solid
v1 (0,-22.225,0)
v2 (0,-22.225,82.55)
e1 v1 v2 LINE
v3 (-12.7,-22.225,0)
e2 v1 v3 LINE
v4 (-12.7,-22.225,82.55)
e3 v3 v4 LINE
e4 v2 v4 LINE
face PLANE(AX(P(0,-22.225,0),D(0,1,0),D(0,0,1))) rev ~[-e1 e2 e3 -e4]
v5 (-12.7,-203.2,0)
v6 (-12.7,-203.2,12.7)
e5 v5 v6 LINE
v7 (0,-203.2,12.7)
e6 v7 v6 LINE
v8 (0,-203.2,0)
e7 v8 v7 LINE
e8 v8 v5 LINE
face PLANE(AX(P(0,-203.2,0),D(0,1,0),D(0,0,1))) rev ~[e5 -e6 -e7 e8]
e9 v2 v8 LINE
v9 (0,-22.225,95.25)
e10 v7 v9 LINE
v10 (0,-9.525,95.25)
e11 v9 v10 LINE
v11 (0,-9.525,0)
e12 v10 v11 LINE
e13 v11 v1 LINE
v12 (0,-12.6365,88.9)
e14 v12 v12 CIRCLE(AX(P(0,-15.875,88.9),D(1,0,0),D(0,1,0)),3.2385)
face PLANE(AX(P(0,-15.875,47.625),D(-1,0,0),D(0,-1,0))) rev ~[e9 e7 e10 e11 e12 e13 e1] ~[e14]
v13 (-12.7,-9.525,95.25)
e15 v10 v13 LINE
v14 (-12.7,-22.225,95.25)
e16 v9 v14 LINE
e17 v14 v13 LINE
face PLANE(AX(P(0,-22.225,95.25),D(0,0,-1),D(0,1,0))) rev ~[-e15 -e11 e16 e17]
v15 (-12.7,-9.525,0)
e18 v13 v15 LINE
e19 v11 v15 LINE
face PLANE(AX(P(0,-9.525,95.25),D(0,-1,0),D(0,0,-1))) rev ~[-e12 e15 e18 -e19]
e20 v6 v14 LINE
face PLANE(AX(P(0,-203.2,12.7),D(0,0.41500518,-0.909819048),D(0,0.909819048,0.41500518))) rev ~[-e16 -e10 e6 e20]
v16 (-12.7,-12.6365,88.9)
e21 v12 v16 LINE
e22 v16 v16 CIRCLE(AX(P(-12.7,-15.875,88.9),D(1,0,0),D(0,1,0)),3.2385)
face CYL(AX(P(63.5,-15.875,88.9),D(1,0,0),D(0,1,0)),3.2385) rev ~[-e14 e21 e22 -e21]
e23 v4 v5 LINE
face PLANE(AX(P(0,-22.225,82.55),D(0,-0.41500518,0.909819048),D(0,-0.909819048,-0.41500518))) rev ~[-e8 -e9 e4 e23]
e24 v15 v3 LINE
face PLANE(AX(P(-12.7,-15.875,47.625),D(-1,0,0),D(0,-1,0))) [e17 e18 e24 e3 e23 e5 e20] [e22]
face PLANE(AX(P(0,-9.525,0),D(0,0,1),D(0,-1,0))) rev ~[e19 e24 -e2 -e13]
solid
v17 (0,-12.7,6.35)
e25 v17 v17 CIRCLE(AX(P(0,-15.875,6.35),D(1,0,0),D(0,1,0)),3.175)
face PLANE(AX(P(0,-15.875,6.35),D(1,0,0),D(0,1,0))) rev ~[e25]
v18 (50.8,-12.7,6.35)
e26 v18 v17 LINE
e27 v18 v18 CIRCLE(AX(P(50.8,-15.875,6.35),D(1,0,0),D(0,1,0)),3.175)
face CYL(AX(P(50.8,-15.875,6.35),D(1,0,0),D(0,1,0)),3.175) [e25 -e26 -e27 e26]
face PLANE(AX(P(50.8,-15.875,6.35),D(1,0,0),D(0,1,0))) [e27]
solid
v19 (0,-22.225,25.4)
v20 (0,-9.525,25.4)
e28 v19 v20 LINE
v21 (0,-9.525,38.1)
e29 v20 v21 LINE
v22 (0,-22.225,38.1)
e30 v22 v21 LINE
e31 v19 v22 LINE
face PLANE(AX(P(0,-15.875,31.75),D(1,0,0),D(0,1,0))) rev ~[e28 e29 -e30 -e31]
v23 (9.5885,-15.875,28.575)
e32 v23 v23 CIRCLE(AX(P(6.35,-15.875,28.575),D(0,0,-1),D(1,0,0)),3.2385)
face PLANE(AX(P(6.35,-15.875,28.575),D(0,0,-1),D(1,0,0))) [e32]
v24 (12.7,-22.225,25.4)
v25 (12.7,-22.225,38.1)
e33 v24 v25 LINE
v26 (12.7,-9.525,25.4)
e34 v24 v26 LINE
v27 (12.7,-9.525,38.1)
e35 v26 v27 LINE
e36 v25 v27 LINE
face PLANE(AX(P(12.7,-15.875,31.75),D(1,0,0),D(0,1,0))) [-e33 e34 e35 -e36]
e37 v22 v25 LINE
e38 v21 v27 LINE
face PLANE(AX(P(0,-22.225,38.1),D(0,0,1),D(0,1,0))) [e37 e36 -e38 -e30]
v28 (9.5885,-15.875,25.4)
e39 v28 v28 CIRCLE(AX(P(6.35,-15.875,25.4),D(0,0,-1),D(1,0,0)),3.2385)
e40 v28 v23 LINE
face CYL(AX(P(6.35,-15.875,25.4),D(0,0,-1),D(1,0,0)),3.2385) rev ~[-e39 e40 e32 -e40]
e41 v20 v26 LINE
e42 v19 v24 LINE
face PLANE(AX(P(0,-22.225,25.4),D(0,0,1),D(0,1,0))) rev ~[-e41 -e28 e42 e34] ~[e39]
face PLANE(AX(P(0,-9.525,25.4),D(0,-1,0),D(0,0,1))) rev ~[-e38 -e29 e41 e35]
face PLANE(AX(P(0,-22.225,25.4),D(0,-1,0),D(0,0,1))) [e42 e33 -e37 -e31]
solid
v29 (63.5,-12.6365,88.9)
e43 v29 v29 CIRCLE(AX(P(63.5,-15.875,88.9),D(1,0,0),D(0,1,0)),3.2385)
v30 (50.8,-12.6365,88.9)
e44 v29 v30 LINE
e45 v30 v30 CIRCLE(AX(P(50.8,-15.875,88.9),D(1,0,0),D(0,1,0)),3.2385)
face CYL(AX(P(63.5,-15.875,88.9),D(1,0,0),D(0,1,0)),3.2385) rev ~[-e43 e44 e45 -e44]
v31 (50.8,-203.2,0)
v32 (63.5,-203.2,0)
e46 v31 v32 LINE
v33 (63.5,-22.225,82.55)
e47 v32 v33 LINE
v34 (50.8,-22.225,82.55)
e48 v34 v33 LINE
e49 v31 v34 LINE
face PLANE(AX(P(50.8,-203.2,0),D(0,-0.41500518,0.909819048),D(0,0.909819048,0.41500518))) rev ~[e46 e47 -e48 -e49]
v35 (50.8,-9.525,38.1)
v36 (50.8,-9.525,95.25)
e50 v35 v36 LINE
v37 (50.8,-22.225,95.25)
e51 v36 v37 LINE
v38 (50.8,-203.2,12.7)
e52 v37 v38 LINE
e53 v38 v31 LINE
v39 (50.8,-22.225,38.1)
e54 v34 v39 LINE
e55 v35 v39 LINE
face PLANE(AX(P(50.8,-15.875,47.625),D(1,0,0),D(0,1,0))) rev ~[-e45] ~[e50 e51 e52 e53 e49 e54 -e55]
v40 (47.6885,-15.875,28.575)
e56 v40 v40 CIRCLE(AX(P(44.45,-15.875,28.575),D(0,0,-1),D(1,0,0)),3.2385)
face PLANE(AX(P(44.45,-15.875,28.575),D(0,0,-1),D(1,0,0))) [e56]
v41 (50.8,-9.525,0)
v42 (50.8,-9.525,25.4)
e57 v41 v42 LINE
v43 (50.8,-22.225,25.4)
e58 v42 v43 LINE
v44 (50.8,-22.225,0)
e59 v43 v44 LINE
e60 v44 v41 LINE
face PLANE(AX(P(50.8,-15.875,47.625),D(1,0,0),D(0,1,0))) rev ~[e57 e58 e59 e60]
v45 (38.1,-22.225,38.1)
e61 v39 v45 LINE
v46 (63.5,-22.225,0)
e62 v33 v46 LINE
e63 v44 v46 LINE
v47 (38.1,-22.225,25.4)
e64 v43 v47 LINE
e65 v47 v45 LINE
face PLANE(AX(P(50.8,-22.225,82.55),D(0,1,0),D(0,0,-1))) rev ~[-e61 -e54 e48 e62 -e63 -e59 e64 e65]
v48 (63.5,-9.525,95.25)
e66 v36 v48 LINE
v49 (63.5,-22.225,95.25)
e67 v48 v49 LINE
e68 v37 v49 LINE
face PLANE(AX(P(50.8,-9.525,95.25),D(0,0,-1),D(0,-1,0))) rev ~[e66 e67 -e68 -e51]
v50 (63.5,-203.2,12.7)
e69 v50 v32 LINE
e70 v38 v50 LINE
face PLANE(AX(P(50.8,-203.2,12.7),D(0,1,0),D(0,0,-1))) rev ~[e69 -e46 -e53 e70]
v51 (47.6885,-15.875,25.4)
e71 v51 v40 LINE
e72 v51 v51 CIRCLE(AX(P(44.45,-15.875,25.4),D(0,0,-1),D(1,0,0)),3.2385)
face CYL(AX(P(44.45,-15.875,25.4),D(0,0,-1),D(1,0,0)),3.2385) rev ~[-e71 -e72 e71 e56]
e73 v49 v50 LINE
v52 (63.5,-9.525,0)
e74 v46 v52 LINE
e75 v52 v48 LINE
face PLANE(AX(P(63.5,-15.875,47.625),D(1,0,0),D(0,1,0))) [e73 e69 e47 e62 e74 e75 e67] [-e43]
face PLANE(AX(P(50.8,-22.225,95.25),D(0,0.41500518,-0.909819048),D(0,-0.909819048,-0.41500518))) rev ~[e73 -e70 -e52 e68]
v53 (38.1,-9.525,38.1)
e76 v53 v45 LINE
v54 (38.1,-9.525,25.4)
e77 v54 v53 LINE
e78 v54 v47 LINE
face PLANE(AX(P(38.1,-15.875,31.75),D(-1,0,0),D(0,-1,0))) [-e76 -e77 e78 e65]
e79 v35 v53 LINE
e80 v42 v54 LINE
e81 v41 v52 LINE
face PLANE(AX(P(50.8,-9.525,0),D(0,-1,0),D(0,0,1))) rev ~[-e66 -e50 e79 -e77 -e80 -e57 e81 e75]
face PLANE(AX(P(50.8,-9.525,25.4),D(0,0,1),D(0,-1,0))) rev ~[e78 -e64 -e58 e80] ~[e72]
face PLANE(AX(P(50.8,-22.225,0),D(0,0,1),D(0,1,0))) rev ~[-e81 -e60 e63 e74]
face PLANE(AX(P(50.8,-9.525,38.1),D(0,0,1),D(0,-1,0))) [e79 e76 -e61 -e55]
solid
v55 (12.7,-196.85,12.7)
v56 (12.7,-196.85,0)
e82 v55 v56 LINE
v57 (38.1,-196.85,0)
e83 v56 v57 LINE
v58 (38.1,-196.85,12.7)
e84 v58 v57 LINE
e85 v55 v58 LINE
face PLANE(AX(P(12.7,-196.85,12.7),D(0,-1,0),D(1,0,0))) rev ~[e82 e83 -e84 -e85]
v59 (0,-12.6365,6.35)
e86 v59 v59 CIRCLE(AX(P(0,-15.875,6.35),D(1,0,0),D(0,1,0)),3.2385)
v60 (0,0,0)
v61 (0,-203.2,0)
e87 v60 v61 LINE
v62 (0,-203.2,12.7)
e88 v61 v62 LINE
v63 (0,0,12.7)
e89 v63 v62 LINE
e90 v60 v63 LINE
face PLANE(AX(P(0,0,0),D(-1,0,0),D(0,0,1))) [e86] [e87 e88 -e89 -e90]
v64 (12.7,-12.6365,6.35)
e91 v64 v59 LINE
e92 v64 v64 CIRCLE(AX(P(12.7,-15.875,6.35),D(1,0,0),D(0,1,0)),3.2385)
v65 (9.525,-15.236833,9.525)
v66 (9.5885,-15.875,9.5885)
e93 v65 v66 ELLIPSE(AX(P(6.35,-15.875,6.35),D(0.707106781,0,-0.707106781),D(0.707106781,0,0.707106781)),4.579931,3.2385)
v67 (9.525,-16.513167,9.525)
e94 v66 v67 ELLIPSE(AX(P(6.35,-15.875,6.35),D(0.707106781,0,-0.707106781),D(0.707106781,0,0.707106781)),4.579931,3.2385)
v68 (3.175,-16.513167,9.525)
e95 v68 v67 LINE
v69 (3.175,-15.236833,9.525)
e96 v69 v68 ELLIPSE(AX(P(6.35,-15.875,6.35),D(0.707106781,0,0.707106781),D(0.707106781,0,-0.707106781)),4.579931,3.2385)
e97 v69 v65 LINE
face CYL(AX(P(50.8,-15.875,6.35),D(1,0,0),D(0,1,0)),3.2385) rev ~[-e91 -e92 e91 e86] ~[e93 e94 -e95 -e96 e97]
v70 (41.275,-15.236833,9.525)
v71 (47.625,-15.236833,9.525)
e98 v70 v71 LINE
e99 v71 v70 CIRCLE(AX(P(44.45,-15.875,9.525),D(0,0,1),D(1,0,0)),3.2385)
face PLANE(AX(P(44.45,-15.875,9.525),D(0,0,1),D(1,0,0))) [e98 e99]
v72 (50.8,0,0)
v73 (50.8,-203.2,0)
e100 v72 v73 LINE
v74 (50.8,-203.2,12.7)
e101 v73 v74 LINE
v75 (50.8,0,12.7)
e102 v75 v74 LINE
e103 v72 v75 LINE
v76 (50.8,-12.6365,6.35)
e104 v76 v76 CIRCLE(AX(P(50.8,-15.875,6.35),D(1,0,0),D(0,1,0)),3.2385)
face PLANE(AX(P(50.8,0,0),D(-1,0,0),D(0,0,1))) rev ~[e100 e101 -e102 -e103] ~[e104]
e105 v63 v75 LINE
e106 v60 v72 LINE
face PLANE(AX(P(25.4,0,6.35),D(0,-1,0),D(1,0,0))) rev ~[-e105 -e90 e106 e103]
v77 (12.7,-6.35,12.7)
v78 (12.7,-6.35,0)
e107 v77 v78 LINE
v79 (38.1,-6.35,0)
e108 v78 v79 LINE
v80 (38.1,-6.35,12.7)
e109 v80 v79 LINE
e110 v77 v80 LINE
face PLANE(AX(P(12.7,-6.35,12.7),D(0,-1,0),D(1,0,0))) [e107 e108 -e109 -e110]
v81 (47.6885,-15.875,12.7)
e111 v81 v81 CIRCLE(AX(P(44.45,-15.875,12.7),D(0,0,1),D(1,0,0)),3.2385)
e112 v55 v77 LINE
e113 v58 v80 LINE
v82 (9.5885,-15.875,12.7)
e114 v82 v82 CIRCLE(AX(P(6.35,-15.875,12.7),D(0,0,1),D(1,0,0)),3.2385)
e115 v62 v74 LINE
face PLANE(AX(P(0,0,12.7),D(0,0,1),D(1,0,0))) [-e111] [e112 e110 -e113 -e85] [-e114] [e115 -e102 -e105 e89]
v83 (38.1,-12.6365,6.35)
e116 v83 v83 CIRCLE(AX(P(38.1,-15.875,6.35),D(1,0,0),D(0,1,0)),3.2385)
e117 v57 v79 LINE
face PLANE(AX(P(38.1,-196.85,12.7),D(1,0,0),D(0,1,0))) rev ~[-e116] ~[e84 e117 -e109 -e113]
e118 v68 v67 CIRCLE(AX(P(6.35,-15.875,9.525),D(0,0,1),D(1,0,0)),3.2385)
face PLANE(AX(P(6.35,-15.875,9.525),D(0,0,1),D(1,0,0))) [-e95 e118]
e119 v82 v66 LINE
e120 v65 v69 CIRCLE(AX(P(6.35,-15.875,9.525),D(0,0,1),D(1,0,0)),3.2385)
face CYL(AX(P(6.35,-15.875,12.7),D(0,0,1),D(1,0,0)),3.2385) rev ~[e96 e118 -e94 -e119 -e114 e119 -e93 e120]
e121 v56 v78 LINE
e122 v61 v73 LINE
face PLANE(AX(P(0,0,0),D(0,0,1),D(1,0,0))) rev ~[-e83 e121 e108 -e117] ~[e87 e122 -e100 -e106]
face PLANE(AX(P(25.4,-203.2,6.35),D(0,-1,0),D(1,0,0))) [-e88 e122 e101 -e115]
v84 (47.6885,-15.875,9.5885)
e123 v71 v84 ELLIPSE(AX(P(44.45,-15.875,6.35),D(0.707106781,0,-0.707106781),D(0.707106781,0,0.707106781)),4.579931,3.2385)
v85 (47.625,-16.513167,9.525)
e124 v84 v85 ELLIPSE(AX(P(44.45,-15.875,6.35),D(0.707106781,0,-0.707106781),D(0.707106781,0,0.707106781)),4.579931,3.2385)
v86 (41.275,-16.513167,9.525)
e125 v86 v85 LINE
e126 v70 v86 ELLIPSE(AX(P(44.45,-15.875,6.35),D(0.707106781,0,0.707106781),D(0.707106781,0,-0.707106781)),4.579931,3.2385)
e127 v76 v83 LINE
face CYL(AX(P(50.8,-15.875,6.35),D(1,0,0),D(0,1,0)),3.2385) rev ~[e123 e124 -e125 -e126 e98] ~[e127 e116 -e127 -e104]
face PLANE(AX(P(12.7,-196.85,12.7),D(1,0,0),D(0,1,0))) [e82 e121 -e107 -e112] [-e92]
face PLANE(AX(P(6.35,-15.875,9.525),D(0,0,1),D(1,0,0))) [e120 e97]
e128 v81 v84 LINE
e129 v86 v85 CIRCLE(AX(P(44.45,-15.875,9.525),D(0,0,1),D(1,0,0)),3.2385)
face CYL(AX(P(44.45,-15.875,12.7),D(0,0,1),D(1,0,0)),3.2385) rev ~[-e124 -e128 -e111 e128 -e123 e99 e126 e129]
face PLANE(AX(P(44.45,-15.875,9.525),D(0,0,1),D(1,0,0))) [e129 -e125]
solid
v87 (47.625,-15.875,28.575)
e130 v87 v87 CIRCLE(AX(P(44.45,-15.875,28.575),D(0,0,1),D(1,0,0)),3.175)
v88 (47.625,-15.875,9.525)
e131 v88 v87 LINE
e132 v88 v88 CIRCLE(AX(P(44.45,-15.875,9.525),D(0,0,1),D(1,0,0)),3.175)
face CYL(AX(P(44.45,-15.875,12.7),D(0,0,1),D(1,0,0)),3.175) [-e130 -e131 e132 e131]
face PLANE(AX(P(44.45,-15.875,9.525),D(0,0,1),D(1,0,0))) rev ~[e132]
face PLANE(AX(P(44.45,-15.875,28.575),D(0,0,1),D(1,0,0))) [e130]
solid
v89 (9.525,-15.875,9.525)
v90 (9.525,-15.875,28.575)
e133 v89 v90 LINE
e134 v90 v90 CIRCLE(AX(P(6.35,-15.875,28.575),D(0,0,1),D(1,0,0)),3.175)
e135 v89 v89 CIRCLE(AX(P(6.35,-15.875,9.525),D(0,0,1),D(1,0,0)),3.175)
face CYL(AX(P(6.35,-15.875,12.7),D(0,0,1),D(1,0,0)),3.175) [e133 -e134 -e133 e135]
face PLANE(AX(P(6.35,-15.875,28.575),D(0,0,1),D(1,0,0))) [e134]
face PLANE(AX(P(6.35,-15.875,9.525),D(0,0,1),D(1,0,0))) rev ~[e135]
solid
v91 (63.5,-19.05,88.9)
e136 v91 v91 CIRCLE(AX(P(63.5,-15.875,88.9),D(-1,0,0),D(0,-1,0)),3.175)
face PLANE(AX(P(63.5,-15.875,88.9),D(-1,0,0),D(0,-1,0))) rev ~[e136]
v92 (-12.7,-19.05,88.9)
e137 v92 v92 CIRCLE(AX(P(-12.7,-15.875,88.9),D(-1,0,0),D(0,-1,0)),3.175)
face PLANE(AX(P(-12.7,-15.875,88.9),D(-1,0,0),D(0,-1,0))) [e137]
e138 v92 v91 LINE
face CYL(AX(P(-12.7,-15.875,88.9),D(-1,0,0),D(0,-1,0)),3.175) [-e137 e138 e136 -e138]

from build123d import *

# Parameters (mm, degrees)
F0_W           = 50.8
F0_H           = 12.7
F1_DEPTH       = 203.2
F2_W           = 25.4
F2_H           = 190.5
F3_DEPTH       = 12.701
F4_R           = 3.2385
F5_DEPTH       = 50.801
F6_R           = 3.175
F7_DEPTH       = 50.8
F9_DEPTH       = 12.7
F11_DEPTH      = 12.7
F12_R          = 3.2385
F13_DEPTH      = 76.201
F14_R          = 3.2385
F15_DEPTH      = 76.201
F16_R          = 3.175
F17_DEPTH      = 76.2
F18_R          = 3.2385
F19_DEPTH      = 3.175
F20_R          = 3.175
F21_DEPTH      = 15.875
F21_DEPTH_BACK = 3.175
F22_W          = 12.7
F22_H          = 12.7
F23_DEPTH      = 12.7
F24_R          = 3.2385
F25_DEPTH      = 3.175
F26_W          = 12.7
F26_H          = 12.7
F27_DEPTH      = 12.7
F28_R          = 3.2385
F29_DEPTH      = 3.175


with BuildPart() as f1:
    # F0 (on Front) → F1 (new body)
    with BuildSketch(Plane.XZ):
        with Locations((25.4, 6.35)):
            Rectangle(F0_W, F0_H)
    extrude(amount=F1_DEPTH)

    # F2 (on face) → F3 (cut, through all)
    with BuildSketch(Plane.XY.offset(12.7)):
        with Locations((25.4, -101.6)):
            Rectangle(F2_W, F2_H)
    extrude(amount=-F3_DEPTH, mode=Mode.SUBTRACT)

    # F4 (on face) → F5 (cut, through all)
    with BuildSketch(Plane.YZ.offset(50.8)):
        with Locations((-15.875, 6.35)):
            Circle(F4_R)
    extrude(amount=-F5_DEPTH, mode=Mode.SUBTRACT)

    # F14 (on face) → F15 (cut, through all)
    with BuildSketch(Plane(origin=(-12.7, 0, 0), x_dir=(0, -1, 0), z_dir=(-1, 0, 0))):
        with Locations((15.875, 88.9)):
            Circle(F14_R)
    extrude(amount=-F15_DEPTH, mode=Mode.SUBTRACT)

    # F18 (on face) → F19 (cut)
    with BuildSketch(Plane.XY.offset(12.7)):
        with Locations((6.35, -15.875)):
            Circle(F18_R)
        with Locations((44.45, -15.875)):
            Circle(F18_R)
    extrude(amount=-F19_DEPTH, mode=Mode.SUBTRACT)


with BuildPart() as f7:
    # F6 (on face) → F7 (new body)
    with BuildSketch(Plane.YZ.offset(50.8)):
        with Locations((-15.875, 6.35)):
            Circle(F6_R)
    extrude(amount=-F7_DEPTH)


with BuildPart() as f9:
    # F8 (on face) → F9 (new body)
    with BuildSketch(Plane.YZ.offset(50.8)):
        Polygon((-22.225, 0), (-9.525, 0), (-9.525, 95.25), (-22.225, 95.25), (-22.225, 82.55), align=None)
        Polygon((-203.2, 0), (-22.225, 82.55), (-22.225, 95.25), (-203.2, 12.7), align=None)
    extrude(amount=F9_DEPTH)


with BuildPart() as f11:
    # F10 (on face) → F11 (new body)
    with BuildSketch(Plane(origin=(0, 0, 0), x_dir=(0, -1, 0), z_dir=(-1, 0, 0))):
        Polygon((9.525, 95.25), (9.525, 0), (22.225, 0), (22.225, 82.55), (22.225, 95.25), align=None)
        Polygon((22.225, 95.25), (22.225, 82.55), (203.2, 0), (203.2, 12.7), align=None)
    extrude(amount=F11_DEPTH)


with BuildPart() as f13_tool:
    # F12 (on face) → F13 (new body, through all)
    with BuildSketch(Plane.YZ.offset(63.5)):
        with Locations((-15.875, 88.9)):
            Circle(F12_R)
    extrude(amount=-F13_DEPTH)


with BuildPart() as f9_1:
    add(f9.part)

    # F13: cut by f13_tool
    add(f13_tool.part, mode=Mode.SUBTRACT)

    # F26 (on face) → F27 (join)
    with BuildSketch(Plane(origin=(50.8, 0, 0), x_dir=(0, -1, 0), z_dir=(-1, 0, 0))):
        with Locations((15.875, 31.75)):
            Rectangle(F26_W, F26_H)
    extrude(amount=F27_DEPTH)

    # F28 (on face) → F29 (cut)
    with BuildSketch(Plane(origin=(0, 0, 25.4), x_dir=(1, 0, 0), z_dir=(0, 0, -1))):
        with Locations((44.45, 15.875)):
            Circle(F28_R)
    extrude(amount=-F29_DEPTH, mode=Mode.SUBTRACT)


with BuildPart() as f11_1:
    add(f11.part)

    # F13: cut by f13_tool
    add(f13_tool.part, mode=Mode.SUBTRACT)


with BuildPart() as f17:
    # F16 (on face) → F17 (new body)
    with BuildSketch(Plane(origin=(-12.7, 0, 0), x_dir=(0, -1, 0), z_dir=(-1, 0, 0))):
        with Locations((15.875, 88.9)):
            Circle(F16_R)
    extrude(amount=-F17_DEPTH)


with BuildPart() as f21:
    # F20 (on face) → F21 (new body, two sides)
    with BuildSketch(Plane.XY.offset(12.7)) as f21_sk:
        with Locations((6.35, -15.875)):
            Circle(F20_R)
    extrude(amount=F21_DEPTH)
    extrude(f21_sk.sketch, amount=-F21_DEPTH_BACK)


with BuildPart() as f21b:
    # F20 (on face) → F21, piece 2 (new body, two sides)
    with BuildSketch(Plane.XY.offset(12.7)) as f21_2_sk:
        with Locations((44.45, -15.875)):
            Circle(F20_R)
    extrude(amount=F21_DEPTH)
    extrude(f21_2_sk.sketch, amount=-F21_DEPTH_BACK)


with BuildPart() as f23:
    # F22 (on face) → F23 (new body)
    with BuildSketch(Plane.YZ):
        with Locations((-15.875, 31.75)):
            Rectangle(F22_W, F22_H)
    extrude(amount=F23_DEPTH)

    # F24 (on face) → F25 (cut)
    with BuildSketch(Plane(origin=(0, 0, 25.4), x_dir=(1, 0, 0), z_dir=(0, 0, -1))):
        with Locations((6.35, 15.875)):
            Circle(F24_R)
    extrude(amount=-F25_DEPTH, mode=Mode.SUBTRACT)


solid = Compound([f1.part, f7.part, f9_1.part, f11_1.part, f17.part, f21.part, f21b.part, f23.part])
